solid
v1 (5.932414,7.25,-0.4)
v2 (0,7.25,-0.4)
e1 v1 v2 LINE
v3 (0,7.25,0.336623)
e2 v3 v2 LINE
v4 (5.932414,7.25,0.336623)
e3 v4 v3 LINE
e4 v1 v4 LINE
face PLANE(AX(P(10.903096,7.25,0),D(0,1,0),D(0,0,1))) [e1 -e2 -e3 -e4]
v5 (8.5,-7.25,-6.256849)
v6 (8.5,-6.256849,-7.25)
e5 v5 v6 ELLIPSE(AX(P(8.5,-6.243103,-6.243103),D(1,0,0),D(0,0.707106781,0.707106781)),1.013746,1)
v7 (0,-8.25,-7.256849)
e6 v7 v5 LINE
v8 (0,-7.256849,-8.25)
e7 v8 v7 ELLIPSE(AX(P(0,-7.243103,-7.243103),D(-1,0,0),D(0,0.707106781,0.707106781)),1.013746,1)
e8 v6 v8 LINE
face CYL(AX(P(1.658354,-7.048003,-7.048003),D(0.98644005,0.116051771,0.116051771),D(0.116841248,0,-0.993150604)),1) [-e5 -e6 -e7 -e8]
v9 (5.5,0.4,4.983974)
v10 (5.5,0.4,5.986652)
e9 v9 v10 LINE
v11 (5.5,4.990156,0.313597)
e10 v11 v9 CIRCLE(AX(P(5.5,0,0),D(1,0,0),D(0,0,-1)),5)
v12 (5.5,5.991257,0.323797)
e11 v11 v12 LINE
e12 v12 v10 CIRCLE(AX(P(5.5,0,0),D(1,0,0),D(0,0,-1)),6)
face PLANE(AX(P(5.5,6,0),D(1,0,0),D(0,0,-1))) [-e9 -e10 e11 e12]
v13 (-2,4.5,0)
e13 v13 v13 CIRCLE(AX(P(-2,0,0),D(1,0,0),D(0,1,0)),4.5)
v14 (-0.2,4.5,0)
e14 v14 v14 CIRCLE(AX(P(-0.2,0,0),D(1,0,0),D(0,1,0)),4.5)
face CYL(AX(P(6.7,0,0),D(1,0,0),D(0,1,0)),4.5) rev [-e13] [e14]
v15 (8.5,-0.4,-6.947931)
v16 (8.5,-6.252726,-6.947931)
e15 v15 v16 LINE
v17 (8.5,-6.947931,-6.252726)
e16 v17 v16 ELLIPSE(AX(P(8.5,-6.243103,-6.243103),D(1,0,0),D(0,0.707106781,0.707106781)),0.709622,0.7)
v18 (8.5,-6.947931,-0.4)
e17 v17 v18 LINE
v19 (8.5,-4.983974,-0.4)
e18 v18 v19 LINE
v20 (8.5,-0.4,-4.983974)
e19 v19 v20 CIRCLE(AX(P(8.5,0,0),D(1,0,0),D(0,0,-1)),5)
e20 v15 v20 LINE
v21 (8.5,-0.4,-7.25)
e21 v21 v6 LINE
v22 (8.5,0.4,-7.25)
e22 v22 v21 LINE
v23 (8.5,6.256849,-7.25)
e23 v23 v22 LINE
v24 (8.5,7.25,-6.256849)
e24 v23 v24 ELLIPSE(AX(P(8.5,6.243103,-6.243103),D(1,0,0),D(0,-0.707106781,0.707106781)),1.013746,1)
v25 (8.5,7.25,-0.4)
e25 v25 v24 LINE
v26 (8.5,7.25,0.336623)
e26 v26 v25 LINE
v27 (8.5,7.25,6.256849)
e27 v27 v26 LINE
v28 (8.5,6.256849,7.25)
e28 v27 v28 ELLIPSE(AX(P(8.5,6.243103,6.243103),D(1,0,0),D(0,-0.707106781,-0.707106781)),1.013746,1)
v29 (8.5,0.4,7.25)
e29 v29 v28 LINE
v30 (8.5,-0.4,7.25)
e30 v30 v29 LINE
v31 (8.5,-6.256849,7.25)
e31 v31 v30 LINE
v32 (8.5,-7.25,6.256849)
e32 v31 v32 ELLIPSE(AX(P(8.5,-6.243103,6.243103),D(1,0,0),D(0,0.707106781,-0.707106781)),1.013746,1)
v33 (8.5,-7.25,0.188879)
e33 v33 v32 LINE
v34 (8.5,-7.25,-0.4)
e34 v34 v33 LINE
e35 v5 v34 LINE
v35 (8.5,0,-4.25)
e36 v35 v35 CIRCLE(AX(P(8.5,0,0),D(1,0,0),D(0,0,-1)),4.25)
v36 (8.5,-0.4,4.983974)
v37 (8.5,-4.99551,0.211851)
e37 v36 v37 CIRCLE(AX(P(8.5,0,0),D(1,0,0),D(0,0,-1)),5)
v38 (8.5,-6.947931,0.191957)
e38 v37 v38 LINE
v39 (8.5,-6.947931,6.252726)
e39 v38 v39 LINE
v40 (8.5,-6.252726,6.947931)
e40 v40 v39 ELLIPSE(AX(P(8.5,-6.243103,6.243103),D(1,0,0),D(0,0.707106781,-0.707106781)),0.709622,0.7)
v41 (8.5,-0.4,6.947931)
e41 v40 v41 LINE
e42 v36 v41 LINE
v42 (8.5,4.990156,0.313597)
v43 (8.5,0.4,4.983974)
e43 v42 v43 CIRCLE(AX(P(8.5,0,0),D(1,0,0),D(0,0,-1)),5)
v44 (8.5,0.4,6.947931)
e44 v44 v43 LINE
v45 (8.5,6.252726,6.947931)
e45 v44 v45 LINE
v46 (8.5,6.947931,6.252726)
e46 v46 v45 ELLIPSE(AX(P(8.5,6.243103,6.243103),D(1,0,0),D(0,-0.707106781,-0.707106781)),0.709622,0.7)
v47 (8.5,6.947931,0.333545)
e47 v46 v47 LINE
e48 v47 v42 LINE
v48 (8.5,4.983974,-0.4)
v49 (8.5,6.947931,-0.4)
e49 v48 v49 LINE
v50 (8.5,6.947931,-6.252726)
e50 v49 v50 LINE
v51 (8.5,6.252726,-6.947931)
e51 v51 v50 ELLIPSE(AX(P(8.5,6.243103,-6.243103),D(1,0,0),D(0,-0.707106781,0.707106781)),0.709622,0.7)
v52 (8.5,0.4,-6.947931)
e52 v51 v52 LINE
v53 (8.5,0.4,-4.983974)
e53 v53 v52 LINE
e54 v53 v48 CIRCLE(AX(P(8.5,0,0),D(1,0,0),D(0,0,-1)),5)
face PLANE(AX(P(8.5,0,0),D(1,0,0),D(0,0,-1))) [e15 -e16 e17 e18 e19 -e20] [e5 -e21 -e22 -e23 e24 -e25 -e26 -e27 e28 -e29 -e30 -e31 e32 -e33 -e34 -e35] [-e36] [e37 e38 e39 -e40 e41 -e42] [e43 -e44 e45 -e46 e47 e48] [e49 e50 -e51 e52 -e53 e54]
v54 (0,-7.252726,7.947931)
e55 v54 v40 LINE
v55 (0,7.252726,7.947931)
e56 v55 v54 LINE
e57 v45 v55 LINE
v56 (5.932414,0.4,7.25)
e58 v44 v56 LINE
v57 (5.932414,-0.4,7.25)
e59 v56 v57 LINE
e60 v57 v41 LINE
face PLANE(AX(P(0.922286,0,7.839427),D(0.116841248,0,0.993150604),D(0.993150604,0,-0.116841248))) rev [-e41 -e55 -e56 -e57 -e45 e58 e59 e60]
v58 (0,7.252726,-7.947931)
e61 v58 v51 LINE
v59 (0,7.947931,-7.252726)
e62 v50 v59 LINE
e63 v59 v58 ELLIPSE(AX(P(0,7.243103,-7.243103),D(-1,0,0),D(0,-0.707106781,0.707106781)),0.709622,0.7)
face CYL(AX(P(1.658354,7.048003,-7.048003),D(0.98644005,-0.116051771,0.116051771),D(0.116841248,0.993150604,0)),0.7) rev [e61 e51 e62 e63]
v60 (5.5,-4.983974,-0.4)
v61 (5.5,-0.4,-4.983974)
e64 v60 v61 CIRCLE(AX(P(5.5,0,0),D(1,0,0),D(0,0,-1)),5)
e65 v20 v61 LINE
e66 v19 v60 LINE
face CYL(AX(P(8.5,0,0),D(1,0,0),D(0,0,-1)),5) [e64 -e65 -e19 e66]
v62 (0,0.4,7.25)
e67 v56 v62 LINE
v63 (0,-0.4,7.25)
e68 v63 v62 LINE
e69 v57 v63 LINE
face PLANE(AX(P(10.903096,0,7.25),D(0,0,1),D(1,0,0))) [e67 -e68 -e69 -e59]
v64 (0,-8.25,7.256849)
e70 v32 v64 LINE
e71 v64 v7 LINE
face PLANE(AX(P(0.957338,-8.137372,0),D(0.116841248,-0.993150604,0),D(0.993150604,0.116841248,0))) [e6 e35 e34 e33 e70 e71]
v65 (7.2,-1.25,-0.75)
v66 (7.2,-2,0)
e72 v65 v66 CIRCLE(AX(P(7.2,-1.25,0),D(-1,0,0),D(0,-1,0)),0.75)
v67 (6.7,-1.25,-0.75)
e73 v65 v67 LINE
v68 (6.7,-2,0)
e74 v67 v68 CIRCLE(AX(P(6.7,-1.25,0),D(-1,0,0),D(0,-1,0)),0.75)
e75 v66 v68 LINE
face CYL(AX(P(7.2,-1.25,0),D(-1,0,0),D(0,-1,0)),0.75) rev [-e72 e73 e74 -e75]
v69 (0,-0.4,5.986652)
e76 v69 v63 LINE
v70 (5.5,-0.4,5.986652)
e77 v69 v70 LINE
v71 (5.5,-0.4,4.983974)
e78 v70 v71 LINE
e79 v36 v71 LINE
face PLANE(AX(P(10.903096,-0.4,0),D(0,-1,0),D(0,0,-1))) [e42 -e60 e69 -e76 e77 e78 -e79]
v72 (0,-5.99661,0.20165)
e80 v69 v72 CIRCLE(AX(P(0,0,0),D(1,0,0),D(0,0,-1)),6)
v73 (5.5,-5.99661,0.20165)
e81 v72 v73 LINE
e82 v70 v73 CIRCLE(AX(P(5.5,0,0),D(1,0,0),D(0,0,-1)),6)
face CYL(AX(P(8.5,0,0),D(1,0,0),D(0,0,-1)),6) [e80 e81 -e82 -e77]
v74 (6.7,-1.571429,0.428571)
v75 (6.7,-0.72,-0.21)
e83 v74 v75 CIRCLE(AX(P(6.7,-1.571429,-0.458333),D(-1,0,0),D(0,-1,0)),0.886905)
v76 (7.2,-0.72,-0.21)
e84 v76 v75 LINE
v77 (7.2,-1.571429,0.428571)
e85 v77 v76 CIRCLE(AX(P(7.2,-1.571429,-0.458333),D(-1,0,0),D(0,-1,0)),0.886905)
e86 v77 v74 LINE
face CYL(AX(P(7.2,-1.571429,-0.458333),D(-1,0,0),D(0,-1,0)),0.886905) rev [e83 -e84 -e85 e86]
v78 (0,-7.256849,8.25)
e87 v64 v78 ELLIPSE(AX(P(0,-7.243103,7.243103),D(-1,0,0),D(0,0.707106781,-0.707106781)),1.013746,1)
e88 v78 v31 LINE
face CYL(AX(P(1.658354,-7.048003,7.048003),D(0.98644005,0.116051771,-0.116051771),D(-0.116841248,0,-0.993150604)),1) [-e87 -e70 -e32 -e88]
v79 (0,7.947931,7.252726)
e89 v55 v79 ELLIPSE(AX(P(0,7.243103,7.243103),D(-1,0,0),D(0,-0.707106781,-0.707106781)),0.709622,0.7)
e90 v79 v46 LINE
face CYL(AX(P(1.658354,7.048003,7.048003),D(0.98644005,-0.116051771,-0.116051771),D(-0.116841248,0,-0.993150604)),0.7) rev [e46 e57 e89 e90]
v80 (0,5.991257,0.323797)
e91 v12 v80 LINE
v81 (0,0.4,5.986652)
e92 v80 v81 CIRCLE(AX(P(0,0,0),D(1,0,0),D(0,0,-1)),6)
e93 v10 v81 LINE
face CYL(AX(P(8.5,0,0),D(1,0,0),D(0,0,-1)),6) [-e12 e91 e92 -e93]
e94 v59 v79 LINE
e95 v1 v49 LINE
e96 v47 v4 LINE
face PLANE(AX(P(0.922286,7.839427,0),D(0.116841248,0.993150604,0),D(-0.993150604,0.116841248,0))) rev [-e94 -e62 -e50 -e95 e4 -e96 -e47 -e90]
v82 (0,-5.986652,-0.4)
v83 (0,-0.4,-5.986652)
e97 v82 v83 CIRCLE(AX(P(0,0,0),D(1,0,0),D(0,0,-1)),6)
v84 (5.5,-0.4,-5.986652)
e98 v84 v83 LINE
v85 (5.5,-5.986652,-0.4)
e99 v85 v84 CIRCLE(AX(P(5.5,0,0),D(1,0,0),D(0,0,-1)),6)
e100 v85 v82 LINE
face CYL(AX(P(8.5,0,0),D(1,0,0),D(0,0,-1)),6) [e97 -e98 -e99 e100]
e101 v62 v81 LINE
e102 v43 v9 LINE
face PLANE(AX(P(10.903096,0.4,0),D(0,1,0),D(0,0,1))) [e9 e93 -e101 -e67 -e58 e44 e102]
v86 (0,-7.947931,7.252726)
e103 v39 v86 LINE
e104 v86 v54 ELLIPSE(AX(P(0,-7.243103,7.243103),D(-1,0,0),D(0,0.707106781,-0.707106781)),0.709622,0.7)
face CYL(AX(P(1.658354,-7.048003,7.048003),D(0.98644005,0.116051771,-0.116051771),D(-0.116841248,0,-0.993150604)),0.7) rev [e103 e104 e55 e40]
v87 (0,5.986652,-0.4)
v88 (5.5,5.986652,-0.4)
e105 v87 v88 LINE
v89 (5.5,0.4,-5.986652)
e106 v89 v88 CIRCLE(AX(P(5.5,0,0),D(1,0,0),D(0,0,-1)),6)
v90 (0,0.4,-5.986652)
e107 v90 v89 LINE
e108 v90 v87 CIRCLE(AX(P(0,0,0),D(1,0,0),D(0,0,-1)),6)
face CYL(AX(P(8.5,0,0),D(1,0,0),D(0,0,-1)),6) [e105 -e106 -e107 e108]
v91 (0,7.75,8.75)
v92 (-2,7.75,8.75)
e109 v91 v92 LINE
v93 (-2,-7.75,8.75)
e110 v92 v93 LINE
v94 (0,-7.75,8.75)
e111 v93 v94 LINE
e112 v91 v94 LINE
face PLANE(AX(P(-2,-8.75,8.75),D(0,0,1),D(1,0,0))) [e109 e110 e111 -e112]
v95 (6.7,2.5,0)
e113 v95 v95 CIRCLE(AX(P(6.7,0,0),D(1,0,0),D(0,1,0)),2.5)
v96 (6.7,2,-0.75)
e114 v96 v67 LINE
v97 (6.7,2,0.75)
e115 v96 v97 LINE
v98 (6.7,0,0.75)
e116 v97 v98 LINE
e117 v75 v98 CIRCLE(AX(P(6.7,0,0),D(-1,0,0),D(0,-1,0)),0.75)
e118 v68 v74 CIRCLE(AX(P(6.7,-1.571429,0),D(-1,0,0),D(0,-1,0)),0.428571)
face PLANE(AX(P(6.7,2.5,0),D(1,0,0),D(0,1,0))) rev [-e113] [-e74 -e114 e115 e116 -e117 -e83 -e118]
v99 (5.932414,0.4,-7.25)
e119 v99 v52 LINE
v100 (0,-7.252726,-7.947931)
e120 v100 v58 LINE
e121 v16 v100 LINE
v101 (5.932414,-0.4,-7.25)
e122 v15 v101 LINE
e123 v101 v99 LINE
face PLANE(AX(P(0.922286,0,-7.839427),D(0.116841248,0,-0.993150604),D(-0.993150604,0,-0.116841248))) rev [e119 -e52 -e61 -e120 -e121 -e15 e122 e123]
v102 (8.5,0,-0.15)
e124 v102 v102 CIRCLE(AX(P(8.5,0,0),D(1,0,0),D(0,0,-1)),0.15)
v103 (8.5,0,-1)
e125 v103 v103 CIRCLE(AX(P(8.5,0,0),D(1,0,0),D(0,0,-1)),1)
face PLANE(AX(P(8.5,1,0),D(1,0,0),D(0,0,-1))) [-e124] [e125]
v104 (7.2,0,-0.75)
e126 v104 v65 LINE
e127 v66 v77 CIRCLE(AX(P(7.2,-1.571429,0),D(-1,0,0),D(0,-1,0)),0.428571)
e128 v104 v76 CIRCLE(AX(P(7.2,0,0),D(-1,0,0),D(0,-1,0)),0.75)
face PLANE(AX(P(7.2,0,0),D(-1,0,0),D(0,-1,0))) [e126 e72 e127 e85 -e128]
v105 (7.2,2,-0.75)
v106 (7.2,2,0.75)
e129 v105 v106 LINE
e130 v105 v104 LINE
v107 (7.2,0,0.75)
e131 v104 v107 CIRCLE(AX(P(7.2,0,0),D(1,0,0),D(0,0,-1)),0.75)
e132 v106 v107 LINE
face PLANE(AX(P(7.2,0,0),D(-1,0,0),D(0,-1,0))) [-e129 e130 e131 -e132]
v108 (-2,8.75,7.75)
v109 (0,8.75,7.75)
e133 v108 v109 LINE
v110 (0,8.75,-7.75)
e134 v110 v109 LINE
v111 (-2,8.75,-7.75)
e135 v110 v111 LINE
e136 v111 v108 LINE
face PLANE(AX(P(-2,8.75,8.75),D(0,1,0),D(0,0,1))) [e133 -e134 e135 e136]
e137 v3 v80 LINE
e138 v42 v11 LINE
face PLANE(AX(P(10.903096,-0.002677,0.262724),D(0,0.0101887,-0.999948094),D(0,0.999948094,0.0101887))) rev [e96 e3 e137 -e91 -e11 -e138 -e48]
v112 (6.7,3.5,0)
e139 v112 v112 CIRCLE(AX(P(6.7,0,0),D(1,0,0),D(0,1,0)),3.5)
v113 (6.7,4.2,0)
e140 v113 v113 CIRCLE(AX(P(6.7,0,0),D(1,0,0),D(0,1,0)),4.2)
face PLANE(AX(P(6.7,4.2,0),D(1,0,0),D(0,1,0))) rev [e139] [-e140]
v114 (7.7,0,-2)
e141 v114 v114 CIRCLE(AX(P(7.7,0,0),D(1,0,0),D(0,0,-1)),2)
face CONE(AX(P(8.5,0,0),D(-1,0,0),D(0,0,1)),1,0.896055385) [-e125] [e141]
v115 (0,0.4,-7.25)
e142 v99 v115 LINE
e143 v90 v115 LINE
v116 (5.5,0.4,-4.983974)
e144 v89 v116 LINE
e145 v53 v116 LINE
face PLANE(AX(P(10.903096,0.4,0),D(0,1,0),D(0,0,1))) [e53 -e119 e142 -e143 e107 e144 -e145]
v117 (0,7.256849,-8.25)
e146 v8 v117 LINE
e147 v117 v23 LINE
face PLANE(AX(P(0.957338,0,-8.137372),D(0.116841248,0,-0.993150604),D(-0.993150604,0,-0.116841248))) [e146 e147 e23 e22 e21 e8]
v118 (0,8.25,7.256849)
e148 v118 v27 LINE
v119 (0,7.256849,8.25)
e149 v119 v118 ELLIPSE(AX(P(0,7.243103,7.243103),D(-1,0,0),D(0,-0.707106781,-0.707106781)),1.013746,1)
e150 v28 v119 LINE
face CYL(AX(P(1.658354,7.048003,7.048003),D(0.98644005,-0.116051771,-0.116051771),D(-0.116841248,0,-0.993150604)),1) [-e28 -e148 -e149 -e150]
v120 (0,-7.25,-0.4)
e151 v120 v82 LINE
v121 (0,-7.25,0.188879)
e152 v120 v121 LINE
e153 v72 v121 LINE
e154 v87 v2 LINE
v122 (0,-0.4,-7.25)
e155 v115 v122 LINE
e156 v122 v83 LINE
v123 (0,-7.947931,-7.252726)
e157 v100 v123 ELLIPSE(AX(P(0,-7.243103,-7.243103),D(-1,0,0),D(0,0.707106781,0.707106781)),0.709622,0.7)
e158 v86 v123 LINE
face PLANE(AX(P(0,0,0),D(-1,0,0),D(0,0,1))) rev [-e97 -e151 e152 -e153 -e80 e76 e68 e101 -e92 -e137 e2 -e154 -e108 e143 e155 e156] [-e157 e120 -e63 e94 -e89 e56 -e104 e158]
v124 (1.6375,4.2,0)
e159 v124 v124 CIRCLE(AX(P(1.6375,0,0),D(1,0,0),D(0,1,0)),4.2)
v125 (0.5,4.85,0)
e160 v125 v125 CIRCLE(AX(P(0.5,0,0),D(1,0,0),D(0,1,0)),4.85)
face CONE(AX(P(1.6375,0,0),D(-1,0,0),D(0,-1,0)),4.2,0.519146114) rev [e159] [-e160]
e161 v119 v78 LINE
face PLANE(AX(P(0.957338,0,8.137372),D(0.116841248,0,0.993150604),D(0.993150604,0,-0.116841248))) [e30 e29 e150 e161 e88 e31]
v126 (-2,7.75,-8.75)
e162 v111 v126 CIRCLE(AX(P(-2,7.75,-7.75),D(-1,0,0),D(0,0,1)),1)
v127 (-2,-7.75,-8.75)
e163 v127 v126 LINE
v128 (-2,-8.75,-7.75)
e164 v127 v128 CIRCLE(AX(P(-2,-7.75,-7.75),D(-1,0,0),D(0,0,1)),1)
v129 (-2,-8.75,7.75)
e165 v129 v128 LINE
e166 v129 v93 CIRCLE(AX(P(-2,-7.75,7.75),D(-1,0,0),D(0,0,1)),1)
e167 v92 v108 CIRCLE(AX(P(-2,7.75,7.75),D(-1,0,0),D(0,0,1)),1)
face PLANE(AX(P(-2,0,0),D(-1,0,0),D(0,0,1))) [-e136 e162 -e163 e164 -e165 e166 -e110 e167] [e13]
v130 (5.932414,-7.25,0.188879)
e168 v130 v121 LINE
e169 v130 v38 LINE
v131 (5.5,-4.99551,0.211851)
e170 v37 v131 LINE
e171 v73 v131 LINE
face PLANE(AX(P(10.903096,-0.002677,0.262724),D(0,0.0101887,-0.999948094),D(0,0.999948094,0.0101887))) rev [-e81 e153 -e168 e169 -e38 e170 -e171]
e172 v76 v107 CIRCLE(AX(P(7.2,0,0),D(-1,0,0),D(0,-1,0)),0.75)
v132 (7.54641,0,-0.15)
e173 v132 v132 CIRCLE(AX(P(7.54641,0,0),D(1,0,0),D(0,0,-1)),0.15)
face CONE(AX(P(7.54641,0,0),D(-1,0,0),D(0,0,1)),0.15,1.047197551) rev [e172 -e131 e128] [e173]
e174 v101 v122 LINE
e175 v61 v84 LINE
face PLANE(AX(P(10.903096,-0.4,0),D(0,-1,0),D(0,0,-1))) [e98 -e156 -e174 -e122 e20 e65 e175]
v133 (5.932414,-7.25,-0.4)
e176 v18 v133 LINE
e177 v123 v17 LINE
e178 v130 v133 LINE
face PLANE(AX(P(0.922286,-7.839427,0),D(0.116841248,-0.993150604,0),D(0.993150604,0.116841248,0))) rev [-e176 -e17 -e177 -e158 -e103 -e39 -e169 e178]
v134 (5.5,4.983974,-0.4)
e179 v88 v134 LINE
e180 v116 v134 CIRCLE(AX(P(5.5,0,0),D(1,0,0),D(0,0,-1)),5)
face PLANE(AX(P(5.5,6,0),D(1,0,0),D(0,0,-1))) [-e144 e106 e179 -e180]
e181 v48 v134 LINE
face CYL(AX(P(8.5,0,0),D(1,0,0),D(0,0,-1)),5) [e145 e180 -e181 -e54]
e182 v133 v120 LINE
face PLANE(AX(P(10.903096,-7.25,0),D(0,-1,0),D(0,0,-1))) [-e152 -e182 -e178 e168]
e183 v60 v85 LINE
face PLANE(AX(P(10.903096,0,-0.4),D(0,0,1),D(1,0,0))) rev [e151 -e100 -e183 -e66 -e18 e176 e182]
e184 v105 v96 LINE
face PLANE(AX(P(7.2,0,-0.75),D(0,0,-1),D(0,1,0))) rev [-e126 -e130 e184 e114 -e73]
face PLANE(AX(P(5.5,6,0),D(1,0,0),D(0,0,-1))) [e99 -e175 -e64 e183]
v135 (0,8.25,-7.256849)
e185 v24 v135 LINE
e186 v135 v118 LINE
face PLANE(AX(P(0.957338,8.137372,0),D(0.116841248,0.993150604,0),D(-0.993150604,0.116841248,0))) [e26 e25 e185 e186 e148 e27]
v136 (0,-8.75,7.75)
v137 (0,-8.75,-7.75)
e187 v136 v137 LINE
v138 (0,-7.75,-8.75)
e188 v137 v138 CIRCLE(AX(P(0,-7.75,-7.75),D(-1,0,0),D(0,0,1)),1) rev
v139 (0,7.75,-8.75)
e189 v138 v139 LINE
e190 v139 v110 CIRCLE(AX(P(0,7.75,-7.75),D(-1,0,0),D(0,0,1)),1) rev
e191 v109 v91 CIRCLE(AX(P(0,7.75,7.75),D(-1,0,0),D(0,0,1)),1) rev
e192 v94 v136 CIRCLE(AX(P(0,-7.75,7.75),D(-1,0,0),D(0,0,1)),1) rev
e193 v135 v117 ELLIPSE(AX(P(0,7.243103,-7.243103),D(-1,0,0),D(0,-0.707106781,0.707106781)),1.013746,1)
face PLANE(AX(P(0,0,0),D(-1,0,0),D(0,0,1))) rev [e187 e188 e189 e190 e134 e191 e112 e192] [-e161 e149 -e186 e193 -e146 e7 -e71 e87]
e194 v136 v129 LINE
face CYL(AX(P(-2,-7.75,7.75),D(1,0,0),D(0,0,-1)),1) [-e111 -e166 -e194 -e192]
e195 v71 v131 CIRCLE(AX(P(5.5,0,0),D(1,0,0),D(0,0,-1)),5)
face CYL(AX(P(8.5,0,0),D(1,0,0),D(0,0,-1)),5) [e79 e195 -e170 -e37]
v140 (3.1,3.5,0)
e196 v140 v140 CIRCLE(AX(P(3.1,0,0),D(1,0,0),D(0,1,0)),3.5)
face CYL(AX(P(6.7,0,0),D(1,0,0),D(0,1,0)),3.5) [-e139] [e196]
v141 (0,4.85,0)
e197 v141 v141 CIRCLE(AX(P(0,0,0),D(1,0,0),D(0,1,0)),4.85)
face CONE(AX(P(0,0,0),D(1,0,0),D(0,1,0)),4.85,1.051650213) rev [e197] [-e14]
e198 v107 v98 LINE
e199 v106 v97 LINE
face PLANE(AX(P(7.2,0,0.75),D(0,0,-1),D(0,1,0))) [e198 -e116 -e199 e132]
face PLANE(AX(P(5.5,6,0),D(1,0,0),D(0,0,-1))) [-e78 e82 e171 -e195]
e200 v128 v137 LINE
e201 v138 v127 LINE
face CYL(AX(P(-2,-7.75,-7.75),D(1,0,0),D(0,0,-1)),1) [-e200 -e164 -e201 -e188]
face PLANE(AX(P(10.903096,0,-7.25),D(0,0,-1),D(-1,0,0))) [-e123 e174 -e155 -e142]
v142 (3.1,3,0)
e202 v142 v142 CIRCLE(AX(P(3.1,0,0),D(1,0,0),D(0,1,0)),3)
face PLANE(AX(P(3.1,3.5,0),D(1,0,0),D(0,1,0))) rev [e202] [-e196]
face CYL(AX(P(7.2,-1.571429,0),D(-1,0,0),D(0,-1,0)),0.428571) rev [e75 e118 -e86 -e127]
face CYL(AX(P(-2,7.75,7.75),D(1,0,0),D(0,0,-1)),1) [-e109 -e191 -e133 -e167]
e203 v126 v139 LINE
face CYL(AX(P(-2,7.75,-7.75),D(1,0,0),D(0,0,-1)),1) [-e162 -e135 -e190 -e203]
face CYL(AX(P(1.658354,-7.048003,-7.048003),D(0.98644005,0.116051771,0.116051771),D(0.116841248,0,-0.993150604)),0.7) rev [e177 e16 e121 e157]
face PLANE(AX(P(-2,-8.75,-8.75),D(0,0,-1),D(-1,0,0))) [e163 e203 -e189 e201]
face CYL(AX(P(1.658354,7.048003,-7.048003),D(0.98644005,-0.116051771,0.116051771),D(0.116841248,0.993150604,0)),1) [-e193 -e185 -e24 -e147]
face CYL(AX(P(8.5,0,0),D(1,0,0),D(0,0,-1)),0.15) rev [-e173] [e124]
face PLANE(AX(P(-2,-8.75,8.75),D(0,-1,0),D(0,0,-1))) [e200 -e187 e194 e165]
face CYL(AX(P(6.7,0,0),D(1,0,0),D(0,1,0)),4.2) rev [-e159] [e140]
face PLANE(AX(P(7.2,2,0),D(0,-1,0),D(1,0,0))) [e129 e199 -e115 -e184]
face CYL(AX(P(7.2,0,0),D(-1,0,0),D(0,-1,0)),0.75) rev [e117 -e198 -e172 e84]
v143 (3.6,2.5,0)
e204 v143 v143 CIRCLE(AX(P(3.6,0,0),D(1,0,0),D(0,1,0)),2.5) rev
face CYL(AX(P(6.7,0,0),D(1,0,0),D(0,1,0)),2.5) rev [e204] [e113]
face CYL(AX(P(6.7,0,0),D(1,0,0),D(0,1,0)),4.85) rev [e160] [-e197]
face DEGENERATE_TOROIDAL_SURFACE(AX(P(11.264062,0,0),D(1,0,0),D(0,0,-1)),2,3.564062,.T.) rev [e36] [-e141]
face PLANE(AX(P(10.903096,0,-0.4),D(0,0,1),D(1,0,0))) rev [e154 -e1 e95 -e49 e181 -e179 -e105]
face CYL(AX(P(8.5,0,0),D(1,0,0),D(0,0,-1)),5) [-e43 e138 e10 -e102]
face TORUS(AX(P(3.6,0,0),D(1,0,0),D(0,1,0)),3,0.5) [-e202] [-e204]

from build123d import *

# Parameters (mm, degrees)
FILLET1_R           = 1
SHELL4_T            = -0.3
SKETCH3_W           = 17.5
SKETCH3_H           = 17.5
BOSS_EXTRUDE1_DEPTH = 2
FILLET2_R           = 1
BOSS_EXTRUDE4_DEPTH = 8.5
FILLET4_R           = 0.5
CUT_EXTRUDE1_DEPTH  = 0.5


# Read off the part's stored shape, not the designer's step: Boss-Extrude4
with BuildPart() as part:
    # Sketch1 → Loft1 section 0
    with BuildSketch(Plane(origin=(0, 0, 0), x_dir=(0, 0, -1), z_dir=(1, 0, 0))):
        with BuildLine():
            Line((-8.25, -8.25), (8.25, -8.25))
            Line((8.25, -8.25), (8.25, 8.25))
            Line((8.25, 8.25), (-8.25, 8.25))
            Line((-8.25, 8.25), (-8.25, -8.25))
        make_face()
    # Sketch2 → Loft1 section 1
    with BuildSketch(Plane.ZY.offset(-8.5)):
        with BuildLine():
            Line((-7.25, -7.25), (7.25, -7.25))
            Line((7.25, -7.25), (7.25, 7.25))
            Line((7.25, 7.25), (-7.25, 7.25))
            Line((-7.25, 7.25), (-7.25, -7.25))
        make_face()
    loft()

    # Fillet1
    fillet1_edges = [part.edges().sort_by_distance(p)[0] for p in [
        (4.25, -7.75, -7.75),
        (4.25, -7.75, 7.75),
        (4.25, 7.75, -7.75),
        (4.25, 7.75, 7.75),
    ]]
    fillet(fillet1_edges, radius=FILLET1_R)

    # Shell4
    shell4_openings = [part.faces().sort_by_distance(p)[0] for p in [
        (8.5, 0, 0),
        (0, 0, 0),
    ]]
    offset(amount=SHELL4_T, openings=shell4_openings)

    # Sketch3 → Boss-Extrude1 (add)
    with BuildSketch(Plane(origin=(0, 0, 0), x_dir=(0, 0, -1), z_dir=(1, 0, 0))):
        Rectangle(SKETCH3_W, SKETCH3_H)
    extrude(amount=-BOSS_EXTRUDE1_DEPTH)

    # Fillet2
    fillet2_edges = [part.edges().sort_by_distance(p)[0] for p in [
        (-1, 8.75, -8.75),
        (-1, -8.75, -8.75),
        (-1, -8.75, 8.75),
        (-1, 8.75, 8.75),
    ]]
    fillet(fillet2_edges, radius=FILLET2_R)

    # Sketch5 → Revolve3 (revolve)
    with BuildSketch(Plane.XY, mode=Mode.PRIVATE) as revolve3_sk:
        with BuildLine():
            Line((0, 0), (0, 6))
            Line((0, 6), (5.5, 6))
            Line((5.5, 6), (5.5, 5))
            Line((5.5, 5), (8.5, 5))
            Line((8.5, 5), (8.5, 4.25))
            ThreePointArc((8.5, 4.25), (7.905950455, 3.193995394), (7.7, 2))
            Line((7.7, 2), (8.5, 1))
            Line((8.5, 1), (8.5, 0))
            Line((8.5, 0), (0, 0))
        make_face()
    revolve(revolve3_sk.sketch.rotate(Axis((8.5, 0, 0), (-1, 0, 0)), 90), axis=Axis((8.5, 0, 0), (-1, 0, 0)))

    # Boss-Extrude4 outline → Boss-Extrude4 (add)
    with BuildSketch(Plane(origin=(0, 0, 0), x_dir=(0, 0, -1), z_dir=(1, 0, 0))):
        with BuildLine():
            Line((7.25, -0.4), (7.25, 0.4))
            Line((7.25, 0.4), (4.983974318, 0.4))
            ThreePointArc((4.983974318, 0.4), (5, 0), (4.983974318, -0.4))
            Line((4.983974318, -0.4), (7.25, -0.4))
        make_face()
        with BuildLine():
            Line((-0.211850638, -4.995509915), (-0.188879124, -7.25))
            Line((-0.188879124, -7.25), (0.4, -7.25))
            Line((0.4, -7.25), (0.4, -4.983974318))
            ThreePointArc((0.4, -4.983974318), (0.094251329, -4.99911159), (-0.211850638, -4.995509915))
        make_face()
        with BuildLine():
            Line((-0.336622937, 7.25), (-0.313596871, 4.99015601))
            ThreePointArc((-0.313596871, 4.99015601), (0.04331199, 4.999812404), (0.4, 4.983974318))
            Line((0.4, 4.983974318), (0.4, 7.25))
            Line((0.4, 7.25), (-0.336622937, 7.25))
        make_face()
        with BuildLine():
            Line((-4.983974318, 0.4), (-7.25, 0.4))
            Line((-7.25, 0.4), (-7.25, -0.4))
            Line((-7.25, -0.4), (-4.983974318, -0.4))
            ThreePointArc((-4.983974318, -0.4), (-5, 0), (-4.983974318, 0.4))
        make_face()
    extrude(amount=BOSS_EXTRUDE4_DEPTH)

    # Sketch7 → Cut-Revolve2 (revolve, cut)
    with BuildSketch(Plane.XY):
        Polygon((-2, 0), (-2, 4.5), (-0.2, 4.5), (0, 4.85), (0.5, 4.85), (1.6375, 4.2), (6.7, 4.2), (6.7, 3.5), (3.1, 3.5), (3.1, 2.5), (6.7, 2.5), (6.7, 0), align=None)
    revolve(axis=Axis((6.7, 0, 0), (-1, 0, 0)), mode=Mode.SUBTRACT)

    # Fillet4
    fillet4_edges = [part.edges().sort_by_distance(p)[0] for p in [
        (3.1, -2.5, 0),
    ]]
    fillet(fillet4_edges, radius=FILLET4_R)

    # Sketch9 → Cut-Extrude1 (cut)
    with BuildSketch(Plane.ZY.offset(-6.7)):
        with BuildLine():
            Line((0.75, 2), (-0.75, 2))
            Line((-0.75, 2), (-0.75, -1.25))
            ThreePointArc((-0.75, -1.25), (-0.530330086, -1.780330086), (0, -2))
            ThreePointArc((0, -2), (0.303045763, -1.874474335), (0.428571429, -1.571428571))
            ThreePointArc((0.428571429, -1.571428571), (0.251190476, -1.039285714), (-0.21, -0.72))
            ThreePointArc((-0.21, -0.72), (0.45, -0.6), (0.75, 0))
            Line((0.75, 0), (0.75, 2))
        make_face()
    extrude(amount=-CUT_EXTRUDE1_DEPTH, mode=Mode.SUBTRACT)

    # Sketch10 → Cut-Revolve3 (revolve, cut)
    with BuildSketch(Plane.XY, mode=Mode.PRIVATE) as cut_revolve3_sk:
        Polygon((8.5, 0), (6.372171637, 0), (6.372171637, 0.75), (7.2, 0.75), (7.546410162, 0.15), (8.5, 0.15), align=None)
    revolve(cut_revolve3_sk.sketch.rotate(Axis((8.5, 0, 0), (-1, 0, 0)), 90), axis=Axis((8.5, 0, 0), (-1, 0, 0)), mode=Mode.SUBTRACT)


solid = part.part
